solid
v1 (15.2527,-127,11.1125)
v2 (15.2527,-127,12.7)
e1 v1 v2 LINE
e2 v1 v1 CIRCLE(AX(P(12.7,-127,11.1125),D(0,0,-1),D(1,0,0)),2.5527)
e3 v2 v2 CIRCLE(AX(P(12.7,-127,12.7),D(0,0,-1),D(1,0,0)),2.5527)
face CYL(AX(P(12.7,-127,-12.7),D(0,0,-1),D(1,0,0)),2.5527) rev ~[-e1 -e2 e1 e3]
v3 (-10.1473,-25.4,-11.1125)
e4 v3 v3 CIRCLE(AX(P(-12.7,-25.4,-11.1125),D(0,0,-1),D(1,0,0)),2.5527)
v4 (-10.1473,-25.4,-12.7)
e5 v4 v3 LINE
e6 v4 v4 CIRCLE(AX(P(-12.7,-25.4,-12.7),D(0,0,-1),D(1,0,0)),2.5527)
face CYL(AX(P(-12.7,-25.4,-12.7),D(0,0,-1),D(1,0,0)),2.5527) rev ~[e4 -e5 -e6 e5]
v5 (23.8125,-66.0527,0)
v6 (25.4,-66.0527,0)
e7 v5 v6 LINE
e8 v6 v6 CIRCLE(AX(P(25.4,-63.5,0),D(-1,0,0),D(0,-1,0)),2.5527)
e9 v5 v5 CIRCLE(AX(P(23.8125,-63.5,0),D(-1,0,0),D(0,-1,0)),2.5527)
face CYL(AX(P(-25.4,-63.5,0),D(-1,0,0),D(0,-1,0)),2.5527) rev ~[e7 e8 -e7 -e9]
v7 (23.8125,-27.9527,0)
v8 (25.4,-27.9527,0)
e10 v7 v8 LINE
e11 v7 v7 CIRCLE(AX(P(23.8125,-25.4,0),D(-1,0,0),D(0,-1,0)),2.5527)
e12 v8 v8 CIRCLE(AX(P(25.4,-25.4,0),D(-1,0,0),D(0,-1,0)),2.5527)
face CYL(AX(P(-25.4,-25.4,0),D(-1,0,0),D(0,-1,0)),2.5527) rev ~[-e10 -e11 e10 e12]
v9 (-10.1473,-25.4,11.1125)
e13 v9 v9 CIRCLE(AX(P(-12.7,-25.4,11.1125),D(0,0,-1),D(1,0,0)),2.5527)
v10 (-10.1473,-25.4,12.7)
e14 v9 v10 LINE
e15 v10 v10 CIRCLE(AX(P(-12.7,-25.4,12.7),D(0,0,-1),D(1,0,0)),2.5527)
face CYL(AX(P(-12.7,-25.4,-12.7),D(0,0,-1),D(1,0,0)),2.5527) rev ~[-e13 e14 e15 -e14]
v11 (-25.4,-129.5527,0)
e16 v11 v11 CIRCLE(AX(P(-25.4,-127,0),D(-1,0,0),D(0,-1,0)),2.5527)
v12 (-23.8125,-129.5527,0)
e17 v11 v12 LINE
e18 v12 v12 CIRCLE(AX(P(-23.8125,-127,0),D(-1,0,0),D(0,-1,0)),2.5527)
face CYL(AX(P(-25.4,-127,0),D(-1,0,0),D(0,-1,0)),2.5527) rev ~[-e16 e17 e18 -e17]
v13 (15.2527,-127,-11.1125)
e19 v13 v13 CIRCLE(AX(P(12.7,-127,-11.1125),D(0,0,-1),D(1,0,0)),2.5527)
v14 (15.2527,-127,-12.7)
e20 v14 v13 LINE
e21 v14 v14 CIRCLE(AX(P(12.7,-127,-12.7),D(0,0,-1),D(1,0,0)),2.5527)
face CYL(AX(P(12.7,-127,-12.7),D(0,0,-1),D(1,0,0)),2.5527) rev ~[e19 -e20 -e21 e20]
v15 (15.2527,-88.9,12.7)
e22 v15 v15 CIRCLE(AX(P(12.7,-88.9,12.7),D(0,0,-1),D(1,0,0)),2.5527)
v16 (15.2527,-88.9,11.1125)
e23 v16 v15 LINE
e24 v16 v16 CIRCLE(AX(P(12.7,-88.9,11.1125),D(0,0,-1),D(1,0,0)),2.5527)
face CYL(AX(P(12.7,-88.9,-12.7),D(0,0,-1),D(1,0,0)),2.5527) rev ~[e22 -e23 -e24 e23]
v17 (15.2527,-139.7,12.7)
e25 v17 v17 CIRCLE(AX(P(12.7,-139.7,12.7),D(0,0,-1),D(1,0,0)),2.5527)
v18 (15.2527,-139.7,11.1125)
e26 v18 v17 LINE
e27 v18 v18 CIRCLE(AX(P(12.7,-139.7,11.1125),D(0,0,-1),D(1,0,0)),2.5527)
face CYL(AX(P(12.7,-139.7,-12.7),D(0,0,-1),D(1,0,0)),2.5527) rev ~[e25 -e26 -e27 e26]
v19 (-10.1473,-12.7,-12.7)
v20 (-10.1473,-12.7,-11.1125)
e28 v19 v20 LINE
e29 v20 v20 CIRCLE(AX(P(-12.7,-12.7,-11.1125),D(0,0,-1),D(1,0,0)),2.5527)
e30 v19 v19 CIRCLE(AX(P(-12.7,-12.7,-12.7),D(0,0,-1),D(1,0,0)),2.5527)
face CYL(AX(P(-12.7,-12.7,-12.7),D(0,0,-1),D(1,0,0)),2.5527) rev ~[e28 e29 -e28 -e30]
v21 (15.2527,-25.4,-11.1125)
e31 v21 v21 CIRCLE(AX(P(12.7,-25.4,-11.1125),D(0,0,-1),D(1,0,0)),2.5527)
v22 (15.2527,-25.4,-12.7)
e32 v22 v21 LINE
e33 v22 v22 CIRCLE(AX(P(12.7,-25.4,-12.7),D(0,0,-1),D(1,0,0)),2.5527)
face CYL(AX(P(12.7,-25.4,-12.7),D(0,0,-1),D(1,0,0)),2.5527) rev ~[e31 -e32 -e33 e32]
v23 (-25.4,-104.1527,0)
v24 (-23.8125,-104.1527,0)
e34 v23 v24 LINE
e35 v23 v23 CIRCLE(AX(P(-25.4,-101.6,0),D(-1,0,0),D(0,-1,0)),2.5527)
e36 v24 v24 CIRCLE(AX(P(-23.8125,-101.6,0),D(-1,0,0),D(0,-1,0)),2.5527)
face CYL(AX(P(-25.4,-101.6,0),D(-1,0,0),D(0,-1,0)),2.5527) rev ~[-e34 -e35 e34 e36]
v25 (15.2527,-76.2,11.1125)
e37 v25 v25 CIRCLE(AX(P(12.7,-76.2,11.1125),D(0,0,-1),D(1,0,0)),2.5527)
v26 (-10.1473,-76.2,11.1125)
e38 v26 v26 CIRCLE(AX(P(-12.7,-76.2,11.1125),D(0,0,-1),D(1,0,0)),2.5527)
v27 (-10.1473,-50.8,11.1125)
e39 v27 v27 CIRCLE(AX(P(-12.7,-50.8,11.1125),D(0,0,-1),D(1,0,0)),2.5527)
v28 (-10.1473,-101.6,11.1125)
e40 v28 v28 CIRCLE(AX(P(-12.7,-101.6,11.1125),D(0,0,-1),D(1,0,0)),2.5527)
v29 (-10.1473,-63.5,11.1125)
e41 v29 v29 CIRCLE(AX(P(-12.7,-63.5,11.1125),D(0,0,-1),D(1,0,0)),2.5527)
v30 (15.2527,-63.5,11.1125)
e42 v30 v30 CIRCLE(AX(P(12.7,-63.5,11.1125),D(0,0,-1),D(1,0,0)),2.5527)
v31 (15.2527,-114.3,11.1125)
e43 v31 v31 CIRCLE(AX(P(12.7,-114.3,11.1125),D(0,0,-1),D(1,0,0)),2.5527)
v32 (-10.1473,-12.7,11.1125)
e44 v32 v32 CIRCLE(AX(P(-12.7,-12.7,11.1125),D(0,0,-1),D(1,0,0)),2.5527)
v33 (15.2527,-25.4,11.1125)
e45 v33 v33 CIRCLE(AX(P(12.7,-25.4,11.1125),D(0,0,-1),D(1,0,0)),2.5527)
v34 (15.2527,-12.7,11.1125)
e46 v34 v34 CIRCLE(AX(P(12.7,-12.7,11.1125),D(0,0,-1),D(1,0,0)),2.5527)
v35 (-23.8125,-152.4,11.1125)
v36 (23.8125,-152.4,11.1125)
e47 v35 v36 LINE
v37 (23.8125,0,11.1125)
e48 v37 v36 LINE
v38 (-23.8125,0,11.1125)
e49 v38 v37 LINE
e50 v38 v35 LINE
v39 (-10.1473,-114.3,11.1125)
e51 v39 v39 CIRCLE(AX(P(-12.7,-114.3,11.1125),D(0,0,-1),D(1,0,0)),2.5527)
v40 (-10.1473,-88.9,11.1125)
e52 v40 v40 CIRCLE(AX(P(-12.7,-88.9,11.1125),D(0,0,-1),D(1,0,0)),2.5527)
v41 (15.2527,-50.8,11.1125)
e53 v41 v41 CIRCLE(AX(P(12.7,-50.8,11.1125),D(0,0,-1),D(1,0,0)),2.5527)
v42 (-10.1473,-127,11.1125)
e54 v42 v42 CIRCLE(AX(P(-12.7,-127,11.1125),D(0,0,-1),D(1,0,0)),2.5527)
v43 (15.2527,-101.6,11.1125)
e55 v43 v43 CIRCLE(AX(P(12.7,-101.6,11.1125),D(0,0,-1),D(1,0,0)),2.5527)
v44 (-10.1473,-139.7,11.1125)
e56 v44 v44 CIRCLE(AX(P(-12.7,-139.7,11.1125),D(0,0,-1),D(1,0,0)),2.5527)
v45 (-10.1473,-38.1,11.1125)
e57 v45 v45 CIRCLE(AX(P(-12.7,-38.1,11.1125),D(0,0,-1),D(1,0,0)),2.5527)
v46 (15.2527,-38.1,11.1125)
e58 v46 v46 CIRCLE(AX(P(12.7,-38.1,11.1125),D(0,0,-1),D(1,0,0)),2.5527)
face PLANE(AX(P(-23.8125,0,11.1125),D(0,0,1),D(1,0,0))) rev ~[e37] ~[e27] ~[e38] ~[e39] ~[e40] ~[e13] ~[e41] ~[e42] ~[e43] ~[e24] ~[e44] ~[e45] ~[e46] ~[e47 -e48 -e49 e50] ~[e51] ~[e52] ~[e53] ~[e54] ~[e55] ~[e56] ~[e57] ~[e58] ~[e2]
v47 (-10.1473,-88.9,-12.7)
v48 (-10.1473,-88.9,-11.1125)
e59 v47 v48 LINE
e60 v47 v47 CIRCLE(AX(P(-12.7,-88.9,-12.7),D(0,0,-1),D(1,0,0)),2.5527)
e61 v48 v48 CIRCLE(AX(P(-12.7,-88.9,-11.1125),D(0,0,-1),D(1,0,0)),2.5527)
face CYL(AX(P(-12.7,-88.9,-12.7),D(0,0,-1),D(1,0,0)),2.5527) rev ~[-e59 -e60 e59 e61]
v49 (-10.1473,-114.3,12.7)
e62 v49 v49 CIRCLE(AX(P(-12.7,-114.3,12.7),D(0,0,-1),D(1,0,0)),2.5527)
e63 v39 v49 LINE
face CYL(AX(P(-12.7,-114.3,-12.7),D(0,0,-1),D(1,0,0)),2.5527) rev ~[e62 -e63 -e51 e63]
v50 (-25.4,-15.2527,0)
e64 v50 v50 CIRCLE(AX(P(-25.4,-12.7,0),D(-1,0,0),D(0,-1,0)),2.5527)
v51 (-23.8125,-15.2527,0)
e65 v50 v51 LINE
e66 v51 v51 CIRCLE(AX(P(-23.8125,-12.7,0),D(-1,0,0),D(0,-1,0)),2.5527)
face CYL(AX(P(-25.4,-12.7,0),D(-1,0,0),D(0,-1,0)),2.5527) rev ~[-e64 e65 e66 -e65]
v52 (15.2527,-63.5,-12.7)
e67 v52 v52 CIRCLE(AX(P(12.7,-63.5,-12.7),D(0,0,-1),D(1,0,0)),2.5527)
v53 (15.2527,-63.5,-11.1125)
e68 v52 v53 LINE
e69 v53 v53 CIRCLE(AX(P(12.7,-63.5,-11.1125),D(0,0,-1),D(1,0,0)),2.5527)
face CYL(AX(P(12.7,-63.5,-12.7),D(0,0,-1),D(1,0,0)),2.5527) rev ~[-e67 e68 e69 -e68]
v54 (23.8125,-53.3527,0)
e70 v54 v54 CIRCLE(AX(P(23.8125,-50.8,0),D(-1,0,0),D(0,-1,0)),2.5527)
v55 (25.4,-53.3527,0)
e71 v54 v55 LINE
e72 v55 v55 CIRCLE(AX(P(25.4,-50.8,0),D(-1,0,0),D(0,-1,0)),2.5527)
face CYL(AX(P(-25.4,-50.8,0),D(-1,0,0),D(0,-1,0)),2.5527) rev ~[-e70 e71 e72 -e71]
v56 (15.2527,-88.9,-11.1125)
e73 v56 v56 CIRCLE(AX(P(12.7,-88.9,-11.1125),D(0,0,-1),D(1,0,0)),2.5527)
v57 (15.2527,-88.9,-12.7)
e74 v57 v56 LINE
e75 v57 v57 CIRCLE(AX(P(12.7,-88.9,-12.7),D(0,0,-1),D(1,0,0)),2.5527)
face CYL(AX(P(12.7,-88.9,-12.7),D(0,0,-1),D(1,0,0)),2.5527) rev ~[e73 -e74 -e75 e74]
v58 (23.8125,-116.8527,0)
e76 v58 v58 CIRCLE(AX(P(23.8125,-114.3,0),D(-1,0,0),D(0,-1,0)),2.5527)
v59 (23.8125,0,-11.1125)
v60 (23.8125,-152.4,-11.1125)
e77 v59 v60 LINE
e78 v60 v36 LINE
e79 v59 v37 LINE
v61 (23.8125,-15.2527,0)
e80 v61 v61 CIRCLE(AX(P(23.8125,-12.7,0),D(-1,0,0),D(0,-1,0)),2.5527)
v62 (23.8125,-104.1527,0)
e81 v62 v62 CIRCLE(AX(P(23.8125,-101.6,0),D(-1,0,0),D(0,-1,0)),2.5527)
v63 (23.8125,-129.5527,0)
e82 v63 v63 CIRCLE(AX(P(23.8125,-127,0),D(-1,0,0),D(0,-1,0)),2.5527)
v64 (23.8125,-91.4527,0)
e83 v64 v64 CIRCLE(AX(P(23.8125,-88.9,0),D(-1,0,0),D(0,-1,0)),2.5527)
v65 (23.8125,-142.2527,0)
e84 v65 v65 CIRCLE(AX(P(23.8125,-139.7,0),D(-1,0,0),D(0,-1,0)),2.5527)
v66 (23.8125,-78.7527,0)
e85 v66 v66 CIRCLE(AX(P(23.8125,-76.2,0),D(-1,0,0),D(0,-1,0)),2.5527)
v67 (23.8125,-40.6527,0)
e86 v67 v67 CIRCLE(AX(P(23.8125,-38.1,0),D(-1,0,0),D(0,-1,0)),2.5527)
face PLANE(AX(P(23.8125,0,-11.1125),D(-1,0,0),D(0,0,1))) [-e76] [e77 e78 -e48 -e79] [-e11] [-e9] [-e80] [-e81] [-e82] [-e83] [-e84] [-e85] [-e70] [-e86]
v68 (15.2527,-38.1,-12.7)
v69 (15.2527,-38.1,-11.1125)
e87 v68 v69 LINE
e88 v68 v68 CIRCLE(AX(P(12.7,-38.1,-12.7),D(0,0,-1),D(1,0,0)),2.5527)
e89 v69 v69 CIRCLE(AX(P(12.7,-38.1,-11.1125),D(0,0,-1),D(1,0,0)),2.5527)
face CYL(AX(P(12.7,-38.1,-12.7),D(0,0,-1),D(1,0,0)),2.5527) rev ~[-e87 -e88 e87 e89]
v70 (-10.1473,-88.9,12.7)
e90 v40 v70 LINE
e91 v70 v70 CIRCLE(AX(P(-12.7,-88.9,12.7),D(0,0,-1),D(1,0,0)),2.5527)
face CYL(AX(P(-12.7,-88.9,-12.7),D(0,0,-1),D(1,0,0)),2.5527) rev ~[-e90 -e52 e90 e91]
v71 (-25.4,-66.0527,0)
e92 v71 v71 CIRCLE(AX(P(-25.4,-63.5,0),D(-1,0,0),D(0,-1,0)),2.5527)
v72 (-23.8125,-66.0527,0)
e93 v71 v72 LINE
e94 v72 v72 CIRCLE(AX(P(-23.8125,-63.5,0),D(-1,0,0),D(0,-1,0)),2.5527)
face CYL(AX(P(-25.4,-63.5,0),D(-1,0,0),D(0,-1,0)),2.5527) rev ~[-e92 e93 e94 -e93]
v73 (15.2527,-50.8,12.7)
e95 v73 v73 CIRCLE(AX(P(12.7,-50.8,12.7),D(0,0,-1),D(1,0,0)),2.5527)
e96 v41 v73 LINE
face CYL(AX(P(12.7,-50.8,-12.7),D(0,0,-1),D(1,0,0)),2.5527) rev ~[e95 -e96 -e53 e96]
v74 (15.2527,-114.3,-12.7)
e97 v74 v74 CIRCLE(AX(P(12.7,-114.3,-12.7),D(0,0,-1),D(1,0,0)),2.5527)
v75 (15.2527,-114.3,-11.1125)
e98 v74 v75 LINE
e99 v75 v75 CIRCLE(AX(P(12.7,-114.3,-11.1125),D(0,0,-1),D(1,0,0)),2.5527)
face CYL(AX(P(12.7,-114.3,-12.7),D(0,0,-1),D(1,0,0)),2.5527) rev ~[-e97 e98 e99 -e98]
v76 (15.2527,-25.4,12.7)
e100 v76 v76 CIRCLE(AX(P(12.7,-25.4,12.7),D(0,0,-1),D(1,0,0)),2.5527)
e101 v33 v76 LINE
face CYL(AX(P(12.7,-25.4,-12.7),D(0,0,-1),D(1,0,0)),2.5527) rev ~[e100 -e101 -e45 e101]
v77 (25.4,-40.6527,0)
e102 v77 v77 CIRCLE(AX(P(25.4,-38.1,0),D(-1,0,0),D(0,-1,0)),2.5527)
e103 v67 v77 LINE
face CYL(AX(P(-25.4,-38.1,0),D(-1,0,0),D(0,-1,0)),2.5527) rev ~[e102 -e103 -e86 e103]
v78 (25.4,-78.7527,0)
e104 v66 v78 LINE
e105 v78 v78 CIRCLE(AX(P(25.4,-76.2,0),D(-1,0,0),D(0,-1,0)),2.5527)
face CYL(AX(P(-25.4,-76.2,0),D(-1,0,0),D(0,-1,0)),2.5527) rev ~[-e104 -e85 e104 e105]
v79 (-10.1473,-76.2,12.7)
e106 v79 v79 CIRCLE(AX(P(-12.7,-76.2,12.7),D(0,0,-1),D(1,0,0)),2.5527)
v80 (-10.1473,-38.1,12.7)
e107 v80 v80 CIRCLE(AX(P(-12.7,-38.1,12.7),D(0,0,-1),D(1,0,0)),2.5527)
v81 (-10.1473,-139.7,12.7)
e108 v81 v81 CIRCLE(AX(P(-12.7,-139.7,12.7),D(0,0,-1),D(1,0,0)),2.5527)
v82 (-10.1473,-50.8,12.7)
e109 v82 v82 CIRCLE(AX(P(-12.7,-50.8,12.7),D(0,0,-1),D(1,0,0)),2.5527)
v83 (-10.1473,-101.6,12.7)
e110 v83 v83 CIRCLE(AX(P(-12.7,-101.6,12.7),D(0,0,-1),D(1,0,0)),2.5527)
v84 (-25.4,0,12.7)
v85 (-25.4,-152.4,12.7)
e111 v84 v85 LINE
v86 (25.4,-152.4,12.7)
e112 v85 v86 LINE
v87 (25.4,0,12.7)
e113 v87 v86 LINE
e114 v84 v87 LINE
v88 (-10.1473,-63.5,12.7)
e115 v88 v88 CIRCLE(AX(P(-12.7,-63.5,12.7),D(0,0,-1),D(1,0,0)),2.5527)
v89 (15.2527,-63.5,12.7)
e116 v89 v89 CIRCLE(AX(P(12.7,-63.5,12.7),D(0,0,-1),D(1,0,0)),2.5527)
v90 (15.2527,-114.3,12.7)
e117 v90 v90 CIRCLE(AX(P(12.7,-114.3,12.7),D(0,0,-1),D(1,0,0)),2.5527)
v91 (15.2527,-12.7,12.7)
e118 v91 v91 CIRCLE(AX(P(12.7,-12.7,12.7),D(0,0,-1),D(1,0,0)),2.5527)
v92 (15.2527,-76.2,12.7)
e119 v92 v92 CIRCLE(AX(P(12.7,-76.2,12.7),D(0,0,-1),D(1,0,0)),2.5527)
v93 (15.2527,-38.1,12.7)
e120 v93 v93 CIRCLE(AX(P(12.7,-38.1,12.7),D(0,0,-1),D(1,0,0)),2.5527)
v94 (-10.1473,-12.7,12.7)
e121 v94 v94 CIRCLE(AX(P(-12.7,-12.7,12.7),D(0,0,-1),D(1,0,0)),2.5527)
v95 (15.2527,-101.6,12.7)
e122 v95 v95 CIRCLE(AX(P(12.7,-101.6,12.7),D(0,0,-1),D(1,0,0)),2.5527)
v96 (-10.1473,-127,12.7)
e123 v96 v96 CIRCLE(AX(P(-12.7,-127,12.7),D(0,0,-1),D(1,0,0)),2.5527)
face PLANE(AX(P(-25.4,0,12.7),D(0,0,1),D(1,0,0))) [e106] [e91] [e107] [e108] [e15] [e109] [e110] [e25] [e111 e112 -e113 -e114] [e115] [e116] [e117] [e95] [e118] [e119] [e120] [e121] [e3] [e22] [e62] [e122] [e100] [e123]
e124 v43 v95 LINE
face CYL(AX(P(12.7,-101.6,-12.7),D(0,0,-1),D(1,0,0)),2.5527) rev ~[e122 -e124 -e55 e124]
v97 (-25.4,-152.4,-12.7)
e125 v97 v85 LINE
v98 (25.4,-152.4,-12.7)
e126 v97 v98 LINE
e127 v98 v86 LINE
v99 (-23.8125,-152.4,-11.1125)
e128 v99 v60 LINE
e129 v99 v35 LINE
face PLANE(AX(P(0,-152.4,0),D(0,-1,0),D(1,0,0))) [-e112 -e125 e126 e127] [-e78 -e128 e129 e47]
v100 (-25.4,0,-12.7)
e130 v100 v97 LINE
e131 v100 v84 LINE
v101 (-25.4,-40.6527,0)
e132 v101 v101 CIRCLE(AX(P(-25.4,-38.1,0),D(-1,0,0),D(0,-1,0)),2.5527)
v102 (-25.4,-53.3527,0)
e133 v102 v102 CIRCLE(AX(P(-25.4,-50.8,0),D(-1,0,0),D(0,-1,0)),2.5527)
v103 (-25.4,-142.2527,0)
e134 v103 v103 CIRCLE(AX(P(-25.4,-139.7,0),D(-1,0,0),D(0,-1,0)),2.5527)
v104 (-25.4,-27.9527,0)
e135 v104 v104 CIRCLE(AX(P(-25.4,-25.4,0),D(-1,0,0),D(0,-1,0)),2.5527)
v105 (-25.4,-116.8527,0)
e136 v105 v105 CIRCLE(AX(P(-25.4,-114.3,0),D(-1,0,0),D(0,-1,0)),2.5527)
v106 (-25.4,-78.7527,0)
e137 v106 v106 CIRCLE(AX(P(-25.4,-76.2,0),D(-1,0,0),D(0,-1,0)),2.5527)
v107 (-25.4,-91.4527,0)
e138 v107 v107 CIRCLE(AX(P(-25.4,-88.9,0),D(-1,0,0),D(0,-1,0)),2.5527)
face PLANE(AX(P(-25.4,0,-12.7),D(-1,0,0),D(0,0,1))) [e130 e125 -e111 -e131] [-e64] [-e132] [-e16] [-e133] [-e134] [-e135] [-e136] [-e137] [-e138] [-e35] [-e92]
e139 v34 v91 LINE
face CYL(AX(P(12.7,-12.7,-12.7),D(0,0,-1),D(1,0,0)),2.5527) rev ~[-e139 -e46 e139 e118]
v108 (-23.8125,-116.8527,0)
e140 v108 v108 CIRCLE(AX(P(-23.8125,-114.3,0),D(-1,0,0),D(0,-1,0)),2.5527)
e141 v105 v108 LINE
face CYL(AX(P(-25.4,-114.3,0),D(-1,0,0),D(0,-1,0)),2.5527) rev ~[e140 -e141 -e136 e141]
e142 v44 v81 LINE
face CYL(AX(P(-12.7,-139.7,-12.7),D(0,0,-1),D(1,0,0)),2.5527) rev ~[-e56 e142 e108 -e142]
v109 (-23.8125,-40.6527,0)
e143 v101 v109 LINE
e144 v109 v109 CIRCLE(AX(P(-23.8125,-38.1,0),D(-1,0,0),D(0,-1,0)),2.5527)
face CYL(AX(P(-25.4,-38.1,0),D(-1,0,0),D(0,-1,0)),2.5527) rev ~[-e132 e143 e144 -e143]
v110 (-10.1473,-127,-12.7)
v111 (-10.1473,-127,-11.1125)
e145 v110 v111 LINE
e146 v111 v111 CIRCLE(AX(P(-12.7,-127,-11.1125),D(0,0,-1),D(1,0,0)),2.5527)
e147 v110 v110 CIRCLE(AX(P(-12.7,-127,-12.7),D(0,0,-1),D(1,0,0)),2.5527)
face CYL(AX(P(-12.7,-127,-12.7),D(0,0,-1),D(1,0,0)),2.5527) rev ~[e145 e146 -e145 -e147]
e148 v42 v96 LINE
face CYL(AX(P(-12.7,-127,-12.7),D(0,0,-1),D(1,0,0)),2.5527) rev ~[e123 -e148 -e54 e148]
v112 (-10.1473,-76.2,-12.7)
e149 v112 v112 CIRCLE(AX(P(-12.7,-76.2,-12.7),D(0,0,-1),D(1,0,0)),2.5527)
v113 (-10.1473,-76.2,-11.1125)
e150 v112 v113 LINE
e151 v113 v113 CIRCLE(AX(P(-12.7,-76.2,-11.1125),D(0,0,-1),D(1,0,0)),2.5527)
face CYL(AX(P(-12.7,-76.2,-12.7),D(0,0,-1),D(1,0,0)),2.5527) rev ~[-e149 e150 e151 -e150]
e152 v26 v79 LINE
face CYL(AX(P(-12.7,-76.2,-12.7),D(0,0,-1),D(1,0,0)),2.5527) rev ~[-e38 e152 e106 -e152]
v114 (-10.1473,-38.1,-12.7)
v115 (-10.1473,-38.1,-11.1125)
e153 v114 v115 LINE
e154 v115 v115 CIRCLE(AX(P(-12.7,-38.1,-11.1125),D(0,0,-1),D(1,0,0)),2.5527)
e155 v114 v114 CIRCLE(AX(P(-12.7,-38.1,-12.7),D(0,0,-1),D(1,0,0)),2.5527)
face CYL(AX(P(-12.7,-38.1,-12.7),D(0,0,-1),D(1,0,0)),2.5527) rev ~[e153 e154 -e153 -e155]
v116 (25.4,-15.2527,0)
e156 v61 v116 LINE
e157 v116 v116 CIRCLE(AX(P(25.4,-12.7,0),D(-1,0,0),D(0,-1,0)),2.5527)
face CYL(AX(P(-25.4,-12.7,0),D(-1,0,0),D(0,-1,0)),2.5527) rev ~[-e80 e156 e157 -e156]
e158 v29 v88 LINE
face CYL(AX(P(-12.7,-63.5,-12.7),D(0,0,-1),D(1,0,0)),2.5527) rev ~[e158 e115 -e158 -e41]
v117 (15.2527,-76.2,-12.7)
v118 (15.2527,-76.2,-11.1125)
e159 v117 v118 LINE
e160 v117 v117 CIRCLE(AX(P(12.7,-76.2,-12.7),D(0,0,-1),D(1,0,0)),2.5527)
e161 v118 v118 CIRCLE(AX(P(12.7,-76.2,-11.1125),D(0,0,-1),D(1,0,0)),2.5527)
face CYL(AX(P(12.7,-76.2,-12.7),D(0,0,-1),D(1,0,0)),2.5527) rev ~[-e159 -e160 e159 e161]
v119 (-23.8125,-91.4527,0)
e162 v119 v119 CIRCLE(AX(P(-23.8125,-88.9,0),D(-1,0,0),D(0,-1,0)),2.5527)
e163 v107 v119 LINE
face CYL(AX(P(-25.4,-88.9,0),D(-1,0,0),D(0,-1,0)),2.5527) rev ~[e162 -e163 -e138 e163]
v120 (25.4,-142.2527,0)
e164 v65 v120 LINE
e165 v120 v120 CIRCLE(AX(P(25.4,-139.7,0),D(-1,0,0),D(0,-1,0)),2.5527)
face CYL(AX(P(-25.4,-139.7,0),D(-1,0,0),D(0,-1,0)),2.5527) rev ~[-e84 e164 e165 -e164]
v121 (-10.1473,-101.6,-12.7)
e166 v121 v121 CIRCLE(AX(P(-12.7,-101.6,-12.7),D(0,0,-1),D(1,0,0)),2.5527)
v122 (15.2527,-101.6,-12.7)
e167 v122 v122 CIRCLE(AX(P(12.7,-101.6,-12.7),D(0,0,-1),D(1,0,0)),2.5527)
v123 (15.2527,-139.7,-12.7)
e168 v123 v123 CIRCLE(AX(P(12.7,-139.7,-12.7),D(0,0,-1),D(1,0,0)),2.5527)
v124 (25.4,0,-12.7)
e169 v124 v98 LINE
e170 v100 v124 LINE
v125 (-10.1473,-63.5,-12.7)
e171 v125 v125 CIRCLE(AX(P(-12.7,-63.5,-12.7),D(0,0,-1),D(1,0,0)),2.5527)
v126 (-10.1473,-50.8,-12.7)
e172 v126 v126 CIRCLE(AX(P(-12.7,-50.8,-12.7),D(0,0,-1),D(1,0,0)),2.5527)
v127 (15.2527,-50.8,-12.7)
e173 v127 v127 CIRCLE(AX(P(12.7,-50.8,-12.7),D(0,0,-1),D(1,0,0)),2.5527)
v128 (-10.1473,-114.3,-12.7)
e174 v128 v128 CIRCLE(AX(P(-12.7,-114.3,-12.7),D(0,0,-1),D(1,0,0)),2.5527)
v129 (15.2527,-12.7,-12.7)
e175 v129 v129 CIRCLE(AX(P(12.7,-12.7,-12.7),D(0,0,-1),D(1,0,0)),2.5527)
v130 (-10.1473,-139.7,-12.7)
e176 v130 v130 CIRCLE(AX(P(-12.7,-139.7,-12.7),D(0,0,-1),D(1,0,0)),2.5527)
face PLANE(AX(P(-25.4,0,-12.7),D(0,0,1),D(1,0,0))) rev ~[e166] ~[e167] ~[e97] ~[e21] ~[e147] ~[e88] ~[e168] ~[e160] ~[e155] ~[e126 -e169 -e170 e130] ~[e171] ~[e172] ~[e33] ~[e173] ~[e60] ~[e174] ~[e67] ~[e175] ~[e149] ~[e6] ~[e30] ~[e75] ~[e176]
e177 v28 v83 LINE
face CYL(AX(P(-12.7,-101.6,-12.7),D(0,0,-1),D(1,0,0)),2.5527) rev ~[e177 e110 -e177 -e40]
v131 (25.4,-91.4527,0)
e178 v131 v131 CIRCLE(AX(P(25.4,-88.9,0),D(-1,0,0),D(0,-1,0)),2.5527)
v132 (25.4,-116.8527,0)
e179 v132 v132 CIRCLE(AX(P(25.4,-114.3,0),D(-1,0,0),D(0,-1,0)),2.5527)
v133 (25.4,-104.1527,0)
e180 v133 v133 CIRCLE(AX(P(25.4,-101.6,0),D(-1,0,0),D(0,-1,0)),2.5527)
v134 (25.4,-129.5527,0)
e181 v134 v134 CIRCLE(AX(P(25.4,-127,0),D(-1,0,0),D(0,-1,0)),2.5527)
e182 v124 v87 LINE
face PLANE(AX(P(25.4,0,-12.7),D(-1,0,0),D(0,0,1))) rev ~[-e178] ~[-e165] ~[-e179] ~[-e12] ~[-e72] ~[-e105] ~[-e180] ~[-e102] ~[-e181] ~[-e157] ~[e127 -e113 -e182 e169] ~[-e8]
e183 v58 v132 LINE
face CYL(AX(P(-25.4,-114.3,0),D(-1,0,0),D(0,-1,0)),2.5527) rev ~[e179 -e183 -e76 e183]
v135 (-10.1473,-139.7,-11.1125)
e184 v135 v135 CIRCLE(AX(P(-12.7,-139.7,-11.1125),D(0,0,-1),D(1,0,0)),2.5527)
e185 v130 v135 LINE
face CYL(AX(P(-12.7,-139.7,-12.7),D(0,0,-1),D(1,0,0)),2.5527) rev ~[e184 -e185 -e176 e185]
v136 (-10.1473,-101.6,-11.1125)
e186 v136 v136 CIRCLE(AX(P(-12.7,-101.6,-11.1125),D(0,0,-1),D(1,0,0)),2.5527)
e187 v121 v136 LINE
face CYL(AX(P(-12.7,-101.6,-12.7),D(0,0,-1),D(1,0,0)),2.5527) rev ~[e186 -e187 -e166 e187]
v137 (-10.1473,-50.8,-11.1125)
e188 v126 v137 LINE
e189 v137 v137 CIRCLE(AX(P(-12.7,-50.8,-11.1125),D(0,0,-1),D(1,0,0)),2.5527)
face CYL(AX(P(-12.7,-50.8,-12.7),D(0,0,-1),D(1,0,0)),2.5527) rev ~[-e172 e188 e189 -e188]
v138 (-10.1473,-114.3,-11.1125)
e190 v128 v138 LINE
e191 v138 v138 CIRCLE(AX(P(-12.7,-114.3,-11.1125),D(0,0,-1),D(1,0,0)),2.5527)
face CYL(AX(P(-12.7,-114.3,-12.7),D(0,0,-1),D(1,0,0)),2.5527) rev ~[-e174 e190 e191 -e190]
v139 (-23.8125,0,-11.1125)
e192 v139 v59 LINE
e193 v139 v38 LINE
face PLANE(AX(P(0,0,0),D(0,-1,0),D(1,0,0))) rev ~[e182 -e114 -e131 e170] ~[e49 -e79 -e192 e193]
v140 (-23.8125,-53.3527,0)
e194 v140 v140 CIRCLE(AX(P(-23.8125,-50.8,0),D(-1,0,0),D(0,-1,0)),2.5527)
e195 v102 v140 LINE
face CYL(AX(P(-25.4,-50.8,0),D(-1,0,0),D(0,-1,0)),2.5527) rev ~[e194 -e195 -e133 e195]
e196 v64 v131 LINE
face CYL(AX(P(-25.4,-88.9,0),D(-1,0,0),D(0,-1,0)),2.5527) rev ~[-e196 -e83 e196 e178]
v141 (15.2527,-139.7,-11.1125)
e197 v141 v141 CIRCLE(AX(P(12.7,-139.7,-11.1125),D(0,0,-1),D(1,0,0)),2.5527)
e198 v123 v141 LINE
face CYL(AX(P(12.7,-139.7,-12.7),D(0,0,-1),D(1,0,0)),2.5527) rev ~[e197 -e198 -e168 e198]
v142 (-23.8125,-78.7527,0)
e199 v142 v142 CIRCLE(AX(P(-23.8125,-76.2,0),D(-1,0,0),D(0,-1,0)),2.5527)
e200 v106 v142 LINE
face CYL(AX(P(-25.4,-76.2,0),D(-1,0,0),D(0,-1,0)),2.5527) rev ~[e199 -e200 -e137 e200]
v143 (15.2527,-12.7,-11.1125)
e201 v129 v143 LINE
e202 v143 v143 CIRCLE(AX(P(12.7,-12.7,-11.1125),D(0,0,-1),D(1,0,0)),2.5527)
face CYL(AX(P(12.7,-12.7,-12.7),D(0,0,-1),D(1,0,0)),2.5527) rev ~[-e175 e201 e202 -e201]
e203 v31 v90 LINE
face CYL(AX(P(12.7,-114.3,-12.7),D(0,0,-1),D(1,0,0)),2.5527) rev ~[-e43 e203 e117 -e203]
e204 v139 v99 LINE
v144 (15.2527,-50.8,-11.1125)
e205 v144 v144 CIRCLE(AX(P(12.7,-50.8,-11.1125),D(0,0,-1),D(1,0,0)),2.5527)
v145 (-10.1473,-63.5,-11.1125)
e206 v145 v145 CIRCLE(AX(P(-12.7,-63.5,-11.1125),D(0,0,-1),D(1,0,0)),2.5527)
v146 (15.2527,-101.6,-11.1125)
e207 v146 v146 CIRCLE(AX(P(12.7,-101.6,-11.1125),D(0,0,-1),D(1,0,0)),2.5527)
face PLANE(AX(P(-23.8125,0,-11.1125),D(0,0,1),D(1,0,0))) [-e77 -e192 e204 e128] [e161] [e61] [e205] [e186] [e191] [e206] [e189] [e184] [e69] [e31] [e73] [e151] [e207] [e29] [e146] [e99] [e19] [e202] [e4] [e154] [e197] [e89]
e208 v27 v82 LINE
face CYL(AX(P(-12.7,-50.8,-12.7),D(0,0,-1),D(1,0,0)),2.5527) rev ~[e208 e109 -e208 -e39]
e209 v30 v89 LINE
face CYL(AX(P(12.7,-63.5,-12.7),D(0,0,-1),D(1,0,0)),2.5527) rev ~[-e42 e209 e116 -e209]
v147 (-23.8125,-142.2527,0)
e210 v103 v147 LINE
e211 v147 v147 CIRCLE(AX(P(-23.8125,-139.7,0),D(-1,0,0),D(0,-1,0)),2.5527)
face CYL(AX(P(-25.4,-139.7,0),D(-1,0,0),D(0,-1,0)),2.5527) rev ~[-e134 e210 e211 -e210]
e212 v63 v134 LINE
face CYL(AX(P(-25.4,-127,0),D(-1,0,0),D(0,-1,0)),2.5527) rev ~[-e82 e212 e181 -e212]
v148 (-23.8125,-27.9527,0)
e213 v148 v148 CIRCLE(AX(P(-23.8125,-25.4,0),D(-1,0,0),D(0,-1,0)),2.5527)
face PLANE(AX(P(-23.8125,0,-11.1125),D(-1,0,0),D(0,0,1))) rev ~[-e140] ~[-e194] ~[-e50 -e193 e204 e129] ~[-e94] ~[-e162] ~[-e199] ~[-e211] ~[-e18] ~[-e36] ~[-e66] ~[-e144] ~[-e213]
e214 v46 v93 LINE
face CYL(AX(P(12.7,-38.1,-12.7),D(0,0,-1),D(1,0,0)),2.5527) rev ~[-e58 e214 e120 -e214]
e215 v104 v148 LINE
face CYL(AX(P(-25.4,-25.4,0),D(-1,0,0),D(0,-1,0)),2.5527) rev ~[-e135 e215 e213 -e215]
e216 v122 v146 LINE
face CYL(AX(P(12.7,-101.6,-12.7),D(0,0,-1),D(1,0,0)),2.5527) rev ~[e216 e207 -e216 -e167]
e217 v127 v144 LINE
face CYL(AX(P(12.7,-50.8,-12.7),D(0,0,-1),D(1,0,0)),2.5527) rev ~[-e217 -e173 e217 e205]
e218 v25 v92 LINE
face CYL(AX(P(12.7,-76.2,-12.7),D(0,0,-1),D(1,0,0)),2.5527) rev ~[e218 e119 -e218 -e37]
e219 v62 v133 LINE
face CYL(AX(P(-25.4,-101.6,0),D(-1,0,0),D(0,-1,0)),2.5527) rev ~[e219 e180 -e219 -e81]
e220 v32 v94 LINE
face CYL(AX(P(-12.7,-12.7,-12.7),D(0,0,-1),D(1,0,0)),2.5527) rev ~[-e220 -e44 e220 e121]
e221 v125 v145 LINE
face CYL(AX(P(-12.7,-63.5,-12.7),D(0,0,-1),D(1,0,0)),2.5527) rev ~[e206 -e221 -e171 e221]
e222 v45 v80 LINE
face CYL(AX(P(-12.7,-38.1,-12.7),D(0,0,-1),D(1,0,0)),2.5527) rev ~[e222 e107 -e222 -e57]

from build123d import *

# Parameters (mm, degrees)
F0_W     = 50.8
F0_H     = 25.4
F0_W_2   = 47.625
F0_H_2   = 22.225
F1_DEPTH = 152.4
F2_R     = 2.5527
F3_DEPTH = 50.8
F4_R     = 2.5527
F5_DEPTH = 254


# Not quite as in the source:
# - a feature names something its author has since deleted; it is built from what else it names


with BuildPart() as f1:
    # F0 (on Front) → F1 (new body)
    with BuildSketch(Plane.XZ):
        Rectangle(F0_W, F0_H)
        Rectangle(F0_W_2, F0_H_2, mode=Mode.SUBTRACT)
    extrude(amount=F1_DEPTH)

    # F2 (on face) → F3 (cut)
    with BuildSketch(Plane(origin=(-25.4, 0, 0), x_dir=(0, -1, 0), z_dir=(-1, 0, 0))):
        with Locations((139.7, 0)):
            Circle(F2_R)
        with Locations((114.3, 0)):
            Circle(F2_R)
        with Locations((25.4, 0)):
            Circle(F2_R)
        with Locations((101.6, 0)):
            Circle(F2_R)
        with Locations((88.9, 0)):
            Circle(F2_R)
        with Locations((127, 0)):
            Circle(F2_R)
        with Locations((63.5, 0)):
            Circle(F2_R)
        with Locations((76.2, 0)):
            Circle(F2_R)
        with Locations((12.7, 0)):
            Circle(F2_R)
        with Locations((38.1, 0)):
            Circle(F2_R)
        with Locations((50.8, 0)):
            Circle(F2_R)
    extrude(amount=-F3_DEPTH, mode=Mode.SUBTRACT)

    # F4 (on face) → F5 (cut)
    with BuildSketch(Plane(origin=(0, 0, -12.7), x_dir=(1, 0, 0), z_dir=(0, 0, -1))):
        with Locations((12.7, 114.3)):
            Circle(F4_R)
        with Locations((-12.7, 12.7)):
            Circle(F4_R)
        with Locations((12.7, 76.2)):
            Circle(F4_R)
        with Locations((-12.7, 25.4)):
            Circle(F4_R)
        with Locations((12.7, 139.7)):
            Circle(F4_R)
        with Locations((12.7, 50.8)):
            Circle(F4_R)
        with Locations((-12.7, 101.6)):
            Circle(F4_R)
        with Locations((-12.7, 50.8)):
            Circle(F4_R)
        with Locations((12.7, 101.6)):
            Circle(F4_R)
        with Locations((12.7, 12.7)):
            Circle(F4_R)
        with Locations((12.7, 88.9)):
            Circle(F4_R)
        with Locations((-12.7, 127)):
            Circle(F4_R)
        with Locations((12.7, 127)):
            Circle(F4_R)
        with Locations((-12.7, 76.2)):
            Circle(F4_R)
        with Locations((-12.7, 139.7)):
            Circle(F4_R)
        with Locations((-12.7, 88.9)):
            Circle(F4_R)
        with Locations((-12.7, 38.1)):
            Circle(F4_R)
        with Locations((12.7, 38.1)):
            Circle(F4_R)
        with Locations((12.7, 63.5)):
            Circle(F4_R)
        with Locations((-12.7, 114.3)):
            Circle(F4_R)
        with Locations((-12.7, 63.5)):
            Circle(F4_R)
        with Locations((12.7, 25.4)):
            Circle(F4_R)
    extrude(amount=-F5_DEPTH, mode=Mode.SUBTRACT)


solid = f1.part
